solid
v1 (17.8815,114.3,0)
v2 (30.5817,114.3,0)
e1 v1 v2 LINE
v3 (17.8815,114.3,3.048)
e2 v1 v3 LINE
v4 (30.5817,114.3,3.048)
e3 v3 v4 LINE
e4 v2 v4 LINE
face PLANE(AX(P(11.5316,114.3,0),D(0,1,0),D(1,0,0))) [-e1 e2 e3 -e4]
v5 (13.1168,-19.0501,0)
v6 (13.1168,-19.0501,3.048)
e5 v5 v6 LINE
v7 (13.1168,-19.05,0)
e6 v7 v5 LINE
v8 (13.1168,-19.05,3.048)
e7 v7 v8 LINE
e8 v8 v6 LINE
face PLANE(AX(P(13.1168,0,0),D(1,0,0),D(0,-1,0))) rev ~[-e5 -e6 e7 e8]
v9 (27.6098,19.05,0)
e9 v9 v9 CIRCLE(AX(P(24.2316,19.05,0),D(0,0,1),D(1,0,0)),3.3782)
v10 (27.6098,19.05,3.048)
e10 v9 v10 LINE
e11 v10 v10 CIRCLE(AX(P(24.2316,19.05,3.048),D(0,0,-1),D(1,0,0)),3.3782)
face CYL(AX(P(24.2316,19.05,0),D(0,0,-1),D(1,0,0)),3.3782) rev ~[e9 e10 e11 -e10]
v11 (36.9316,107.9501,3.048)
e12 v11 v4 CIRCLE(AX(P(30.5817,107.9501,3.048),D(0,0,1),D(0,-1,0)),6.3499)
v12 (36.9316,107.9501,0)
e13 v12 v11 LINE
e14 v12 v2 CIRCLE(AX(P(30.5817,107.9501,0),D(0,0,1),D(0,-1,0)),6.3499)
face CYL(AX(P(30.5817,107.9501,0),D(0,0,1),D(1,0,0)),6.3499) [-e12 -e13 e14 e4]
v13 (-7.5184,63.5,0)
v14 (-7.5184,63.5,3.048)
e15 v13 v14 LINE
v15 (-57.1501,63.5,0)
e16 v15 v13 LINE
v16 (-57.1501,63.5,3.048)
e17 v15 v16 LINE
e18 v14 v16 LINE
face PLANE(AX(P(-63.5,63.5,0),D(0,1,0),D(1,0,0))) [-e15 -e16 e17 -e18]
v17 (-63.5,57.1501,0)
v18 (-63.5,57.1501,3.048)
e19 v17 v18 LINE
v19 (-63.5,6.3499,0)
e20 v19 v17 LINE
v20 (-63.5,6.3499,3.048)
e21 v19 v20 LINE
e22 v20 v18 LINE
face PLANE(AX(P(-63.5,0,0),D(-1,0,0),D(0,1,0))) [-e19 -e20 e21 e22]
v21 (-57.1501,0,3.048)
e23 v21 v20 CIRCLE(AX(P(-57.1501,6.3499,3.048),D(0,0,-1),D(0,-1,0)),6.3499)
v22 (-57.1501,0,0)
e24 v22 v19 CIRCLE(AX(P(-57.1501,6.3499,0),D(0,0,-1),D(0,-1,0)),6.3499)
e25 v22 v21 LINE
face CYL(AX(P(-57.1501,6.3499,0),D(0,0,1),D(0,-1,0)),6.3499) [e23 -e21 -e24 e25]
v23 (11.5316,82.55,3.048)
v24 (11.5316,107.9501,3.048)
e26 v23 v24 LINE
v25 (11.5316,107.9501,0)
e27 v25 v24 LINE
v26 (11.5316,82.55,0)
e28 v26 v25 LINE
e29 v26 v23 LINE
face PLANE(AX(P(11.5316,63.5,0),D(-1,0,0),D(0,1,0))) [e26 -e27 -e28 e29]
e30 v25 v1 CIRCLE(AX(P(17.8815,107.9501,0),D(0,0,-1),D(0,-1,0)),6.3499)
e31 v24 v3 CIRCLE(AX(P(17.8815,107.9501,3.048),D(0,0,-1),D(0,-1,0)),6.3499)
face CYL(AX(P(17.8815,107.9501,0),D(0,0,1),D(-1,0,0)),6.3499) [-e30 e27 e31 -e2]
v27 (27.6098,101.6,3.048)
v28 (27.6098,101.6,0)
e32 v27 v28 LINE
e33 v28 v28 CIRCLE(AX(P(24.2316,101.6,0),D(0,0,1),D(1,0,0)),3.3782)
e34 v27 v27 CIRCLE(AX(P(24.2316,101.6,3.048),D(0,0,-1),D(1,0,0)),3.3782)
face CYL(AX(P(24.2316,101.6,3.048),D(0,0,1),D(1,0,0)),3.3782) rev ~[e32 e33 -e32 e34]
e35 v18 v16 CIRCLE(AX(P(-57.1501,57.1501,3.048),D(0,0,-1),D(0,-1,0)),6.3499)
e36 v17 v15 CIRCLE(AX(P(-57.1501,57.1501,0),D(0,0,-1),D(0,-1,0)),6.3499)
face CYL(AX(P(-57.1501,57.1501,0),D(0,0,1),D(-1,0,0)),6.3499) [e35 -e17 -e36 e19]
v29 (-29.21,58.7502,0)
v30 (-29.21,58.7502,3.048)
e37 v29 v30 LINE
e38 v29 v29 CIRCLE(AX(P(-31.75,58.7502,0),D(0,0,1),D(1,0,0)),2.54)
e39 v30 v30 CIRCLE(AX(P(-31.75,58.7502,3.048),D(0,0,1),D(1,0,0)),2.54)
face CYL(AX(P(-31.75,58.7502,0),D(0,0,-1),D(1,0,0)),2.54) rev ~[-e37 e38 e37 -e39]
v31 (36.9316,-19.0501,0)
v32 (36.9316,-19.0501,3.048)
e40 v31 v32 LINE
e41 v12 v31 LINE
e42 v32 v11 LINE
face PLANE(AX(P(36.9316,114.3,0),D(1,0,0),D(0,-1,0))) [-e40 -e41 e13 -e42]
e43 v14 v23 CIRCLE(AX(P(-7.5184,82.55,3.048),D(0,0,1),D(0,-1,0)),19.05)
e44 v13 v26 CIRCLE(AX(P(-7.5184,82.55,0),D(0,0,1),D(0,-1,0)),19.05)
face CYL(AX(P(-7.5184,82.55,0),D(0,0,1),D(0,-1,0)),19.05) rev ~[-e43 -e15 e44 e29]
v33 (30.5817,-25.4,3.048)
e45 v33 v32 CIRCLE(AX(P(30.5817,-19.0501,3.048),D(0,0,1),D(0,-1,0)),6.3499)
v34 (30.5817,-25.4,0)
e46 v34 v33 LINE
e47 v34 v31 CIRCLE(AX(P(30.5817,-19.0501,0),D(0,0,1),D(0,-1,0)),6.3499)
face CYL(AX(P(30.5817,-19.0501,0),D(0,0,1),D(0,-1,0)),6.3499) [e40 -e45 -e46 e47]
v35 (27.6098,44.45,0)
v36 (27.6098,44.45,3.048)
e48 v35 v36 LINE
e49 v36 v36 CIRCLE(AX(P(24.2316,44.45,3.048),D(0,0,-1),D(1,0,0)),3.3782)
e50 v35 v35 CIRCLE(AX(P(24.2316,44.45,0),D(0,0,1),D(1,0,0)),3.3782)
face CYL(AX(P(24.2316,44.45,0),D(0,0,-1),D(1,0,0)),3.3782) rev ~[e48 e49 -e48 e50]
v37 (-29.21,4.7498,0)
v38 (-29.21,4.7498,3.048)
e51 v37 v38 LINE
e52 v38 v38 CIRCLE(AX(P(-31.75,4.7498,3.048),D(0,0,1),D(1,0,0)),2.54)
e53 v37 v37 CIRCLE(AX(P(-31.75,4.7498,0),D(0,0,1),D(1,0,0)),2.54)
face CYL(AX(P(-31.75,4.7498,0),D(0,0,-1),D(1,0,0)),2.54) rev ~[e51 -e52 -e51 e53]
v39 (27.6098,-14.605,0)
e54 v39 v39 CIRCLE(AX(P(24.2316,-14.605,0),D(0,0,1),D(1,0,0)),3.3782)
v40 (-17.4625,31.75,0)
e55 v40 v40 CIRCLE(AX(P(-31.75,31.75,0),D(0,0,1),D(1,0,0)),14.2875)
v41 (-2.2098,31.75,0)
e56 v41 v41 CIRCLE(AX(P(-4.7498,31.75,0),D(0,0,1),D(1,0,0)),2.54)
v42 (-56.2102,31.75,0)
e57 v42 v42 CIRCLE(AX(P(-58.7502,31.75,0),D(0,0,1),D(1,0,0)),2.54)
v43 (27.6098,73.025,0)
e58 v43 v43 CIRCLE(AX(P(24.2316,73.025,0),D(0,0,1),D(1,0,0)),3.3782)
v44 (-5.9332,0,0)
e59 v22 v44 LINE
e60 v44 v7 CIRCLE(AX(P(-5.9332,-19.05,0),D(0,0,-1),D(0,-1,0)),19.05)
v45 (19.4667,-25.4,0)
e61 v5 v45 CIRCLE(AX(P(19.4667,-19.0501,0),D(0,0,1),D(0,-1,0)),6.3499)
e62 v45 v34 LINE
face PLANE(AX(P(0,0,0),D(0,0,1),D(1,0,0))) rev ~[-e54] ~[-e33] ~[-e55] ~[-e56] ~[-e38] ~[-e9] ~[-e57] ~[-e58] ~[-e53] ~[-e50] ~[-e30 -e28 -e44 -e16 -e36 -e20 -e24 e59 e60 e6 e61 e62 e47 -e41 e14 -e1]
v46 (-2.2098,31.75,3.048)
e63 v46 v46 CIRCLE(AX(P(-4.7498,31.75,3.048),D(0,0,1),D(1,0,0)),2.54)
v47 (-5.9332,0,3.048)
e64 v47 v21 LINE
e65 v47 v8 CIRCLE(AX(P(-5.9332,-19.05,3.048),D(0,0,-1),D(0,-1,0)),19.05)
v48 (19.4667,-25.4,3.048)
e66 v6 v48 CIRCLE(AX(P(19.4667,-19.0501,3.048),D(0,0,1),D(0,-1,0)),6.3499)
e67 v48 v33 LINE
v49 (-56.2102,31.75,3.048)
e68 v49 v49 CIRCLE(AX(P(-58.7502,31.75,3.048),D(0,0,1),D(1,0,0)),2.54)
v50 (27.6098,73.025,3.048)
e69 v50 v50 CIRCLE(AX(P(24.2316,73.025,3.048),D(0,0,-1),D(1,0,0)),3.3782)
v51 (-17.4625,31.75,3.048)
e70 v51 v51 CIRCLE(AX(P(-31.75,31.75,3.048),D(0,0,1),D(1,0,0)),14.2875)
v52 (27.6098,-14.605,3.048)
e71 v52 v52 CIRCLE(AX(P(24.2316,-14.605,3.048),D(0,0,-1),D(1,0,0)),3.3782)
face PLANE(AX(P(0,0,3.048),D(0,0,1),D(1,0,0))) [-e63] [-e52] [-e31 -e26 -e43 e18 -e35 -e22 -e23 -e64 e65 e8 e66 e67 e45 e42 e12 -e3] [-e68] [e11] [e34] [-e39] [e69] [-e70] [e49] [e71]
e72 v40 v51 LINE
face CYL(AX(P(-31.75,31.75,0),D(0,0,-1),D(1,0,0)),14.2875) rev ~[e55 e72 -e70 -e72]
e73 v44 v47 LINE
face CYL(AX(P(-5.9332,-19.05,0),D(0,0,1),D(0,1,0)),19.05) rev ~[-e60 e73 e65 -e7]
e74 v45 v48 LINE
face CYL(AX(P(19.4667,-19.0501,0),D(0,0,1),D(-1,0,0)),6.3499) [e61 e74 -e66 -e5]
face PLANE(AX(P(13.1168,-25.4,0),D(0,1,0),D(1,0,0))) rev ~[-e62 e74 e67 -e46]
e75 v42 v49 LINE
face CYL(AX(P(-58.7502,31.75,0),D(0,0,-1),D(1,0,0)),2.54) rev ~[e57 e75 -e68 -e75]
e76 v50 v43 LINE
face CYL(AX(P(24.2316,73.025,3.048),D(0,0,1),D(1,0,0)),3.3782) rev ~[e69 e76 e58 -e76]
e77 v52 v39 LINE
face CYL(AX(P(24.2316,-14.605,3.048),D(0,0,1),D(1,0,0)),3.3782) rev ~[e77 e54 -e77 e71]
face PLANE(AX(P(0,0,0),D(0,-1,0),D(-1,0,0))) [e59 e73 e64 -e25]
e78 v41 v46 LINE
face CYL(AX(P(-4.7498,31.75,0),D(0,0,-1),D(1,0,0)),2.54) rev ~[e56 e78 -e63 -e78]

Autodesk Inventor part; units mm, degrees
ref_plane "YZ Plane" through (0, 0, 0) normal (1, 0, 0) x (0, 1, 0)
ref_plane "XZ Plane" through (0, 0, 0) normal (0, 1, 0) x (-1, 0, 0)
ref_plane "XY Plane" through (0, 0, 0) normal (0, 0, 1) x (1, 0, 0)
sketch "Sketch1" plane through (0, 0, 0) normal (0, 0, 1) x (1, 0, 0)
  line L0 (0, 0) -> (-63.5, 0)
  line L1 (-63.5, 0) -> (-63.5, 63.5)
  line L2 (-63.5, 63.5) -> (0, 63.5)
  circle A0 centre (-58.7502, 31.75) radius 2.54
  circle A1 centre (-31.75, 58.7502) radius 2.54
  circle A2 centre (-4.7498, 31.75) radius 2.54
  circle A3 centre (-31.75, 4.7498) radius 2.54
  line L3 (36.9316, 63.5) -> (36.9316, 0)
  line L4 (13.1168, 0) -> (0, 0)
  circle A4 centre (-31.75, 31.75) radius 14.2875
  line L5 (24.2316, 63.5) -> (24.2316, 44.45)
  line L6 (24.2316, 44.45) -> (24.2316, 19.05)
  circle A5 centre (24.2316, 44.45) radius 3.3782
  circle A6 centre (24.2316, 19.05) radius 3.3782
  line L7 (20.8534, 44.45) -> (20.8534, 19.05)
  line L8 (27.6098, 19.05) -> (27.6098, 44.45)
  line L9 (11.5316, 63.5) -> (11.5316, 114.3)
  line L10 (13.1168, 0) -> (13.1168, -25.4)
  line L11 (13.1168, -25.4) -> (36.9316, -25.4)
  line L12 (36.9316, -25.4) -> (36.9316, 0)
  line L13 (11.5316, 114.3) -> (36.9316, 114.3)
  line L14 (36.9316, 114.3) -> (36.9316, 63.5)
  line L15 (0, 63.5) -> (11.5316, 63.5)
  dimension "d0" = 63.5
  dimension "d1" = 63.5
  dimension "d6" = 5.08
  dimension "d7" = 5.08
  dimension "d8" = 5.08
  dimension "d9" = 5.08
  dimension "d11" = 36.9316
  dimension "d12" = 28.575
  dimension "d13" = 12.7
  dimension "d15" = 25.4
  dimension "d16" = 6.7564
  dimension "d17" = 6.7564
  dimension "d23" = 50.8
  dimension "d24" = 25.4
extrude "Plate2" add sketch "Sketch1" along normal blind 3.048 contours L0 L1 L2 L15 L9 L13 L14 L3 L12 L11 L10 L4 | L8 A6 L6 A5 | A5 L6 A6 L7
sketch "Sketch4" plane through (0, 0, 3.048) normal (0, 0, 1) x (1, 0, 0)
  circle A0 centre (24.2316, 19.05) radius 3.3782 projected
  circle A1 centre (24.2316, 44.45) radius 3.3782 projected
  line L0 (-63.5, 63.5) -> (11.5316, 63.5) projected
  line L1 (24.2316, 44.45) -> (24.2316, 101.6)
  circle A2 centre (24.2316, 101.6) radius 3.3782
  circle A3 centre (24.2316, 73.025) radius 3.3782
  line L2 (24.2316, 19.05) -> (24.2316, -14.605)
  circle A4 centre (24.2316, -14.605) radius 3.3782
  point P0 (0, 0)
  point P1 (20.8534, 44.45)
  point P2 (20.8534, 19.05)
  point P3 (27.6098, 19.05)
  point P4 (27.6098, 44.45)
  dimension "d25" = 57.15
  dimension "d26" = 6.7564
  dimension "d27" = 6.7564
  dimension "d28" = 33.655
  dimension "d29" = 6.7564
extrude "Cut1" cut sketch "Sketch4" against normal blind 3.048
fillet "Corner Round1" radius 19.05 2 edges at (11.5316, 63.5, 1.524) (13.1168, 0, 1.524)
fillet "Corner Round2" radius 6.35 6 edges at (-63.5, 63.5, 1.524) (-63.5, 0, 1.524) (13.1168, -25.4, 1.524) (36.9316, -25.4, 1.524) (36.9316, 114.3, 1.524) (11.5316, 114.3, 1.524)
equation "\"d19\" = Thickness"
equation "\"BendRadius\" = Thickness"
equation "\"BendReliefWidth\" = Thickness"
equation "\"BendReliefDepth\" = 0.5 * Thickness"
equation "\"CornerReliefSize\" = 4 * Thickness"
equation "\"MinimumRemnant\" = 2 * Thickness"
equation "\"TransitionRadius\" = BendRadius"
equation "\"JacobiRadiusSize\" = BendRadius"
equation "\"GapSize\" = Thickness"
equation "\"d10\" = BendRadius"
equation "\"d18\" = BendRadius"
equation "\"Thickness\" = 3.048"
properties part number "p80 mount plate" material "Aluminum 6061"
